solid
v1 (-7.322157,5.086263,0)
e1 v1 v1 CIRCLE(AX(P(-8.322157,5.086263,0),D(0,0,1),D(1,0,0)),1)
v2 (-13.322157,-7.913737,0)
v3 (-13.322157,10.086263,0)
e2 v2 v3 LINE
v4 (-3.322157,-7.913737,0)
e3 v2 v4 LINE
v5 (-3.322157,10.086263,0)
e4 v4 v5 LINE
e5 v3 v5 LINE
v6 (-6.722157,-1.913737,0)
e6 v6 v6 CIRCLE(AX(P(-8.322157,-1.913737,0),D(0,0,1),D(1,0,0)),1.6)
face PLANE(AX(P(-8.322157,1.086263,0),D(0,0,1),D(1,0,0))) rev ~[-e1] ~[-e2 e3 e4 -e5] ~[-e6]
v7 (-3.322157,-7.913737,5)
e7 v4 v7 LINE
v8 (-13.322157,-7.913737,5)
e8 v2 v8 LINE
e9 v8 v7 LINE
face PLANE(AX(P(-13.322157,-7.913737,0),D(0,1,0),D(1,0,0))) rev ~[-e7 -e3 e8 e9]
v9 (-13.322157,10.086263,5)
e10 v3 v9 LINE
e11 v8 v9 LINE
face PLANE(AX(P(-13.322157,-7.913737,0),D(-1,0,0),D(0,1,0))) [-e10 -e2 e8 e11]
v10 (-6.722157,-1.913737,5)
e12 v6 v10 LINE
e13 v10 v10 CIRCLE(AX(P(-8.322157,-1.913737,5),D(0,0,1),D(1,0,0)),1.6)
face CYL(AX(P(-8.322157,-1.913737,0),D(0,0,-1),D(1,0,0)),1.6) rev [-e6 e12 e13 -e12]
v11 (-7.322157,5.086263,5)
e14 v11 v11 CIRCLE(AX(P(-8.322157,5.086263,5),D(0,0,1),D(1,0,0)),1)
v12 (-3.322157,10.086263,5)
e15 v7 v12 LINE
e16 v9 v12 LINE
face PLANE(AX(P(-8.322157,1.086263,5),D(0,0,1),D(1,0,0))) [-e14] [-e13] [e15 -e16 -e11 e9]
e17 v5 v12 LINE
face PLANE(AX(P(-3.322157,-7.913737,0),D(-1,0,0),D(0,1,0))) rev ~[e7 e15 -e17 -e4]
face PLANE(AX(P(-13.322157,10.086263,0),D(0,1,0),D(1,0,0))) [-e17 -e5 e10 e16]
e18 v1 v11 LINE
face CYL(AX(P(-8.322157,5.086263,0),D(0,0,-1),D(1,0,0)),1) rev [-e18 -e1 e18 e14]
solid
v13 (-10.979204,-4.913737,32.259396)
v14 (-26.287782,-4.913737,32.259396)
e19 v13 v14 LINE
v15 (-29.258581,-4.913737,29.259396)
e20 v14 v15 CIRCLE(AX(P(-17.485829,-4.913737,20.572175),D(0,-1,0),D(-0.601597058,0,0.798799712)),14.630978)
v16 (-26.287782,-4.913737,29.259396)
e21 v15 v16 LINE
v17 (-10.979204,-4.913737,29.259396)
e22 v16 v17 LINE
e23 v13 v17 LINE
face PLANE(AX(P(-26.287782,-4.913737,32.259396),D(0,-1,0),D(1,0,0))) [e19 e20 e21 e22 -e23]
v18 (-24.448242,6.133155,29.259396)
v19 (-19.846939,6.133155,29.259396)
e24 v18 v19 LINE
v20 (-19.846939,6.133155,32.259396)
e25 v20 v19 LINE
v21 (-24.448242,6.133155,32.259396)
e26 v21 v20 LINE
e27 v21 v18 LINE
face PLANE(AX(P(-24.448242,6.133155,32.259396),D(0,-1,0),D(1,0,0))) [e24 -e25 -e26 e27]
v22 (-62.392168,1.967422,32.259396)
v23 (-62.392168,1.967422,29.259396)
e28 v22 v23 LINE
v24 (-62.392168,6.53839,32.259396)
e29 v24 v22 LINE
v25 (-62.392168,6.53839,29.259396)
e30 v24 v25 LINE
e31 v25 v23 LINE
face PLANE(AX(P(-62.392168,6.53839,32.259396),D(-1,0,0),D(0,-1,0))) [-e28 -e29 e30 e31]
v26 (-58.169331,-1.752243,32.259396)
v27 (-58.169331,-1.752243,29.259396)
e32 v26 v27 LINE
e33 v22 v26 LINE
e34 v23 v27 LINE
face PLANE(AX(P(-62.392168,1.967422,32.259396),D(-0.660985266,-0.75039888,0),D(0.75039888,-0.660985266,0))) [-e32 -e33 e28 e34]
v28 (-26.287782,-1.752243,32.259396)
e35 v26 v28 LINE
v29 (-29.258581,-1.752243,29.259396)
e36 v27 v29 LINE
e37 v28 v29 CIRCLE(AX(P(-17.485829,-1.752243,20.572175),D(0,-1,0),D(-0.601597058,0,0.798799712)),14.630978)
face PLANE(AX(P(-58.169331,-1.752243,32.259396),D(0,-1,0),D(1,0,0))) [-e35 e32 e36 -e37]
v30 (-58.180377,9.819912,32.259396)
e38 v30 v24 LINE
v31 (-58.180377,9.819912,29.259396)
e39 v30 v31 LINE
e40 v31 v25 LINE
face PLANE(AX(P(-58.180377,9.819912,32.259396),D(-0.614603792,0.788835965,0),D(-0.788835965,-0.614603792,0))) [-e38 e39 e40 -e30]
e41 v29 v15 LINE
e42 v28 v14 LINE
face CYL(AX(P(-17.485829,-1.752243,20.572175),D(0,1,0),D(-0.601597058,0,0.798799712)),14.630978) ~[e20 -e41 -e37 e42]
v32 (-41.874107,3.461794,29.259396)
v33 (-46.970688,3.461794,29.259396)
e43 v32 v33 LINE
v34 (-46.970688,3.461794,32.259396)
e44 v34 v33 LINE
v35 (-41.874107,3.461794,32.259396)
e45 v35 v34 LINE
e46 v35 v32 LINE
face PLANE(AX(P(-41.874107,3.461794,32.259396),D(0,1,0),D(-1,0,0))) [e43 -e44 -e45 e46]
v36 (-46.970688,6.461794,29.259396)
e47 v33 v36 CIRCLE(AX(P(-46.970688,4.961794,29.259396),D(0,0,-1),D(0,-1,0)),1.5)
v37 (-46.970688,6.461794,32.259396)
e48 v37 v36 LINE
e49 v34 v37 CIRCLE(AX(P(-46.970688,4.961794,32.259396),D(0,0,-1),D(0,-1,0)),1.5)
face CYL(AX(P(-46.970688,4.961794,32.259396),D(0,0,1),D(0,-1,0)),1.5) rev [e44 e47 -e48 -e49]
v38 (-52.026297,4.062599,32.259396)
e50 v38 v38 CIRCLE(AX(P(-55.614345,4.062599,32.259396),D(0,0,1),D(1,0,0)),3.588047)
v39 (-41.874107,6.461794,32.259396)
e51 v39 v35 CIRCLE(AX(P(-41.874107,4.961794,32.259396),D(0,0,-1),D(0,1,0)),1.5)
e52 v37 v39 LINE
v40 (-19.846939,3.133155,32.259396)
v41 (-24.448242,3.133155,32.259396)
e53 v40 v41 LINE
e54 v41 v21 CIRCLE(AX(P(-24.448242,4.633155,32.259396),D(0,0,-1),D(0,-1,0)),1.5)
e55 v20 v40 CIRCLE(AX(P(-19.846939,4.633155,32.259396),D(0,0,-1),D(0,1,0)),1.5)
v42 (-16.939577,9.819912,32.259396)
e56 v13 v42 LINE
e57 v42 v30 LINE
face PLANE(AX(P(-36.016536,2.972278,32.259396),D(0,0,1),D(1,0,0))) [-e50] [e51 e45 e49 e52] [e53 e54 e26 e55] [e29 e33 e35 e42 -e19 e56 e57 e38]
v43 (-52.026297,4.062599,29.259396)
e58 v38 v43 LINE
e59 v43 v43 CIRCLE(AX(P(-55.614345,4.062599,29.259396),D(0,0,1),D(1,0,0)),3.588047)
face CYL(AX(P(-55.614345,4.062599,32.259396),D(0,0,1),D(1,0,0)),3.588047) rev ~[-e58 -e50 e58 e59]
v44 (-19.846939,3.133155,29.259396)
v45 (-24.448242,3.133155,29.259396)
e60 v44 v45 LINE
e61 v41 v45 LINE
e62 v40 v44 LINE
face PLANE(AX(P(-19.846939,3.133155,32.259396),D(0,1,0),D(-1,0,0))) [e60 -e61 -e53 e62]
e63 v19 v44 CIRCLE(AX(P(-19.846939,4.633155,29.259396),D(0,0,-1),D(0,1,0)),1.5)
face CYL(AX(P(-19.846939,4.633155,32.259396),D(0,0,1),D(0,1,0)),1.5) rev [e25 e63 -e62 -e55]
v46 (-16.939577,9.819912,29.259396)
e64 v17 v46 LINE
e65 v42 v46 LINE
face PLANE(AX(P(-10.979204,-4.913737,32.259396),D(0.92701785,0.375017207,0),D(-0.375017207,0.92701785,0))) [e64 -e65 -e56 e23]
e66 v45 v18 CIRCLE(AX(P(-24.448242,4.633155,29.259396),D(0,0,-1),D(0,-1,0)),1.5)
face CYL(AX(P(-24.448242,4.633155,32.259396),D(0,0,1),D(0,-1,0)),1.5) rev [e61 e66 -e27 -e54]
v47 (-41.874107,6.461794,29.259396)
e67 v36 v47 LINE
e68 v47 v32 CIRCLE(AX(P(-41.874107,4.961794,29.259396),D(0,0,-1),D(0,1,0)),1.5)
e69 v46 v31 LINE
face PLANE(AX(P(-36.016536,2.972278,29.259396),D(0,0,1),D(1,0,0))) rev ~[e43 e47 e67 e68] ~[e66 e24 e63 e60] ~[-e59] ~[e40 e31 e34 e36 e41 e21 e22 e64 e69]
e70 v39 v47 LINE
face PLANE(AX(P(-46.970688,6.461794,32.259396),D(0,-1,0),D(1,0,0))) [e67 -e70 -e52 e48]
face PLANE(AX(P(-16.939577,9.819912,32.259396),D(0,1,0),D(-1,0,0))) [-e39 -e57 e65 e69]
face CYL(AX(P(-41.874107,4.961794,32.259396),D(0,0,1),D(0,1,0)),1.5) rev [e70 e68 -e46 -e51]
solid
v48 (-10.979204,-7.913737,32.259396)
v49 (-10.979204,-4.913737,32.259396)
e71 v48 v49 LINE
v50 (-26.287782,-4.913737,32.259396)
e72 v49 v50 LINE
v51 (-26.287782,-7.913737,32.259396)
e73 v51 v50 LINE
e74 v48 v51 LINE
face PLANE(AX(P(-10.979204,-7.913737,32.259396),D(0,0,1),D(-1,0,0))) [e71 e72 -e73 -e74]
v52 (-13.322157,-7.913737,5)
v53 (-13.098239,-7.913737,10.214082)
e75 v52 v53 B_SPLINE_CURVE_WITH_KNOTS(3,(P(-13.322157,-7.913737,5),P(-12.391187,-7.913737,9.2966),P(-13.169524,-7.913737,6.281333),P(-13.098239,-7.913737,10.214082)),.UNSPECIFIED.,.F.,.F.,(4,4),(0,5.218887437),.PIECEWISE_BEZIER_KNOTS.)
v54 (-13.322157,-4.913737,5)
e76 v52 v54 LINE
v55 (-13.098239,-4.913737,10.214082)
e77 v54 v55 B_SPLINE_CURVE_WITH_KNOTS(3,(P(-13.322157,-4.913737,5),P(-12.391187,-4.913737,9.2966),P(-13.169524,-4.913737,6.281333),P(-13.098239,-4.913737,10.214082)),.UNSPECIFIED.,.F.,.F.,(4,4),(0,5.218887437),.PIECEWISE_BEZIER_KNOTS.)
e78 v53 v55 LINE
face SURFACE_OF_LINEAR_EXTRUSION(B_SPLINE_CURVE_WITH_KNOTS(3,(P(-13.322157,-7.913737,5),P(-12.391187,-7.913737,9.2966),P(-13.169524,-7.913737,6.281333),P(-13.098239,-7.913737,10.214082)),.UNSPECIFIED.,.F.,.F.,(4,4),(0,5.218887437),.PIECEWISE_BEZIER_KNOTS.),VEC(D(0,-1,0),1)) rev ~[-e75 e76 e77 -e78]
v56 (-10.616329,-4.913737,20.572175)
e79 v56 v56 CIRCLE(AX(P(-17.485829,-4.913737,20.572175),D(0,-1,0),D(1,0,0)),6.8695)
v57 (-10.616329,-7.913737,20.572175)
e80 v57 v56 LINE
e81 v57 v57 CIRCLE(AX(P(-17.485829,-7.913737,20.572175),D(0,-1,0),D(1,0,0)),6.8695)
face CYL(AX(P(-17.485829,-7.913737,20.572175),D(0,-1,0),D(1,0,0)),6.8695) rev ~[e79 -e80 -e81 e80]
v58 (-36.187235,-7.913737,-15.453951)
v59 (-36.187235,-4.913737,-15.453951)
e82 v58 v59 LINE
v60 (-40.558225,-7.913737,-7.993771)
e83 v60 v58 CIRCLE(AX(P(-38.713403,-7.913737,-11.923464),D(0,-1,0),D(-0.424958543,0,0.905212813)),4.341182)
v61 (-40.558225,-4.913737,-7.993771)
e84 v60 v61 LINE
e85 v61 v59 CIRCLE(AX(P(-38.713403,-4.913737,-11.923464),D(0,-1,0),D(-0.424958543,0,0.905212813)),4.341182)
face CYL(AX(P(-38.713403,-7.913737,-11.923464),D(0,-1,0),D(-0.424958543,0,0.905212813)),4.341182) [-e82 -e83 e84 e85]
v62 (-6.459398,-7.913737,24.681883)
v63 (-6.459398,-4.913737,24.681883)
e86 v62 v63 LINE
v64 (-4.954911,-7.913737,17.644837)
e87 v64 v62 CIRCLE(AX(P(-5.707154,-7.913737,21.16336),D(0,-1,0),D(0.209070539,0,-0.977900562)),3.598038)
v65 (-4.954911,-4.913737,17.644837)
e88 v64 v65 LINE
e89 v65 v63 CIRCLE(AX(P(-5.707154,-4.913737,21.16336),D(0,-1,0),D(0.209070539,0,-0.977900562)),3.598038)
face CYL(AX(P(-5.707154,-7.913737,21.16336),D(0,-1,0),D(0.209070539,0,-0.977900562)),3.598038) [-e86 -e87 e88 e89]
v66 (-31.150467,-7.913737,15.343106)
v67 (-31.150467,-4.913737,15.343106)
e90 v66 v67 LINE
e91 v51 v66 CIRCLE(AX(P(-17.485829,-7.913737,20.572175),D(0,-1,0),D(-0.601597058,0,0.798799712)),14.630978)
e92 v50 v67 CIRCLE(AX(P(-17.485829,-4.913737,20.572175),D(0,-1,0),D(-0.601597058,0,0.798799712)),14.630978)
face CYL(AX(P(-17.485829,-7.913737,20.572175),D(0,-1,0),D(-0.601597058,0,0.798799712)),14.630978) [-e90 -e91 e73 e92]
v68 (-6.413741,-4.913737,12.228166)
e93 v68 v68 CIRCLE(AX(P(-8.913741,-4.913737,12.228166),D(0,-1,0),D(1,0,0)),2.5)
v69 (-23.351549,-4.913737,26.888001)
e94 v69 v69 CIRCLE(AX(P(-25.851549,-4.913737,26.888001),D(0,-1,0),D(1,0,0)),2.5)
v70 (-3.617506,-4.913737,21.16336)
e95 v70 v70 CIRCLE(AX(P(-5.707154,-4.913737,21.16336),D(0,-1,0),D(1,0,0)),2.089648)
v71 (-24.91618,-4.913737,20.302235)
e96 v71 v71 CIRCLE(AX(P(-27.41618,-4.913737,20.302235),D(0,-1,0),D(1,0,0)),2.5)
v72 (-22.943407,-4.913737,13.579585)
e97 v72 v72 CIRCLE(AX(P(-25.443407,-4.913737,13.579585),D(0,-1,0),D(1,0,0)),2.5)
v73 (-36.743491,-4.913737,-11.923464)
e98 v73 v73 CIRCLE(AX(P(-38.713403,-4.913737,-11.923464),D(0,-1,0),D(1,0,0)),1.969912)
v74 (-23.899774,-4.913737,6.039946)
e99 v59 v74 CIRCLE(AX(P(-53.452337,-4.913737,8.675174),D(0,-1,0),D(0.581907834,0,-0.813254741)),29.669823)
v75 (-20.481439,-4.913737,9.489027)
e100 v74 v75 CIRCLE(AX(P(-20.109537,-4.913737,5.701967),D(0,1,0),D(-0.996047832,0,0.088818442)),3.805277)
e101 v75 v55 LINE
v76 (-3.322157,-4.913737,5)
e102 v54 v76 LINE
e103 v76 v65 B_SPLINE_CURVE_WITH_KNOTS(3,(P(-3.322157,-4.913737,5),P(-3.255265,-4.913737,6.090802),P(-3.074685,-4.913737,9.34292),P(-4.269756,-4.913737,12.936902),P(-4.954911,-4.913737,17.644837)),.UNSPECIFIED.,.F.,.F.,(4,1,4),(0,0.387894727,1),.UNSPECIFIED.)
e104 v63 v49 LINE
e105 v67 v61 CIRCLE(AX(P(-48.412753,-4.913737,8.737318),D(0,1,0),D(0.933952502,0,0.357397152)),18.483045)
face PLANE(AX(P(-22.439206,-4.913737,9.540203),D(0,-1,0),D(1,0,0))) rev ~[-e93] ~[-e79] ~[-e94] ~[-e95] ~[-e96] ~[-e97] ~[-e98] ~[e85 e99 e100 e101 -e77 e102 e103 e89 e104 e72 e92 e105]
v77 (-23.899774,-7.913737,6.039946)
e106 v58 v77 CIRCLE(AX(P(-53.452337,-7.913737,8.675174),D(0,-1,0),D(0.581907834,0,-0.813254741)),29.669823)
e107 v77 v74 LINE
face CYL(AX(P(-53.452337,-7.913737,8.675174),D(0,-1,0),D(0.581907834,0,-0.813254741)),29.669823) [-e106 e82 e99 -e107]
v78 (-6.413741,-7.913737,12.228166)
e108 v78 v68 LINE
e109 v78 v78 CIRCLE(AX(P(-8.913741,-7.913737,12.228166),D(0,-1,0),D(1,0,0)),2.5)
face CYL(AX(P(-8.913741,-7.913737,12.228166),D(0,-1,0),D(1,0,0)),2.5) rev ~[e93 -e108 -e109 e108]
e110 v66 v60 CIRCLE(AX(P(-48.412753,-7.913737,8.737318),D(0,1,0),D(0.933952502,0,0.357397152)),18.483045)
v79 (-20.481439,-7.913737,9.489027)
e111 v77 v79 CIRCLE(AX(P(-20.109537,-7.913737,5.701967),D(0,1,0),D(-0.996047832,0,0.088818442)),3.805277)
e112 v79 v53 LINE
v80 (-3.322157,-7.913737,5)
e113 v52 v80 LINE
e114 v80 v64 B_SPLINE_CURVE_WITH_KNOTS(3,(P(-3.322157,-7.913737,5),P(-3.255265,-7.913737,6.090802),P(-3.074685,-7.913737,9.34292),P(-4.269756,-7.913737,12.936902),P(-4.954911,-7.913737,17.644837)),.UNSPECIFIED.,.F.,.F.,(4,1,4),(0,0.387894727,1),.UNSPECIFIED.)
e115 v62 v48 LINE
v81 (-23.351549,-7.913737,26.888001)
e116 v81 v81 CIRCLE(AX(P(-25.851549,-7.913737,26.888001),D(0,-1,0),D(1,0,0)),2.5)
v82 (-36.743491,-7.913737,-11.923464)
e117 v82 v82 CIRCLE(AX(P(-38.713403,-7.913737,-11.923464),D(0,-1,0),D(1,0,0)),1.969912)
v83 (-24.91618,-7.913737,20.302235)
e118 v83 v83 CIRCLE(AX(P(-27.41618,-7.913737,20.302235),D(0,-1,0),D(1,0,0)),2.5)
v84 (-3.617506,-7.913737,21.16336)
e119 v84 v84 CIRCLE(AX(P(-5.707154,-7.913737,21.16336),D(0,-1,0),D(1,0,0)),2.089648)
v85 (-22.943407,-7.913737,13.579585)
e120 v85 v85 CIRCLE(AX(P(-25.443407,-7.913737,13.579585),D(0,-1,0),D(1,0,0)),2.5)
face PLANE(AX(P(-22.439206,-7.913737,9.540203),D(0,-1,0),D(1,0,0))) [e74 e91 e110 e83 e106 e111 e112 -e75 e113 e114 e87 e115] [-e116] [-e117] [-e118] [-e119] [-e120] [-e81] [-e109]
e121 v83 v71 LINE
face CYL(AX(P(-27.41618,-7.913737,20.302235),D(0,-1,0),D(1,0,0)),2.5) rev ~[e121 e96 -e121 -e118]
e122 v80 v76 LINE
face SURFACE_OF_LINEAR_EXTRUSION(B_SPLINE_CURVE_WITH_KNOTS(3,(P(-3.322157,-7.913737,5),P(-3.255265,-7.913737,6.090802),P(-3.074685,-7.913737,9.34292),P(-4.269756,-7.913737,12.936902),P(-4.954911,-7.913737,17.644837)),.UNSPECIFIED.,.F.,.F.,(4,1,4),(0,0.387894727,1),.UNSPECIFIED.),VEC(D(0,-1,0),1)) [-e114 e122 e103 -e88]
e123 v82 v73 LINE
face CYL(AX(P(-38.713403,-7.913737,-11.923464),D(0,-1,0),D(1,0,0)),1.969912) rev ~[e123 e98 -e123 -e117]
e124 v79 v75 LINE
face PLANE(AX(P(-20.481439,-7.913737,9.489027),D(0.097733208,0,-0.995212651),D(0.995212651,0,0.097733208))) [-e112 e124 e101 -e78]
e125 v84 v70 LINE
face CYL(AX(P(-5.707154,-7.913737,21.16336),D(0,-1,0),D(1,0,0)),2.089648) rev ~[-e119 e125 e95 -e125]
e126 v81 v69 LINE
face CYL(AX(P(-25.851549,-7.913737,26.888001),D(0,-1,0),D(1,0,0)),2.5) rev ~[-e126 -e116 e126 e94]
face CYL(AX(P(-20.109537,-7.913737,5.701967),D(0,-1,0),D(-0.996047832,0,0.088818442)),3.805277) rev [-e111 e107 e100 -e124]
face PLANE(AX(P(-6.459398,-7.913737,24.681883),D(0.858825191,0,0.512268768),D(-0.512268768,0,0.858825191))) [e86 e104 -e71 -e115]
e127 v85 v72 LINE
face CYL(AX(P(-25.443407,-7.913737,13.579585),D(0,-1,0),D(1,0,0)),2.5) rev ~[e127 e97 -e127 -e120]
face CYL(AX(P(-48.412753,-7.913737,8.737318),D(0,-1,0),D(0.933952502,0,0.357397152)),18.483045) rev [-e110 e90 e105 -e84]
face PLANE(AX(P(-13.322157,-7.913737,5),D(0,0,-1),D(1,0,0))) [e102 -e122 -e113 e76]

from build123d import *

# Parameters (mm, degrees)
F0_W     = 10
F0_H     = 18
F0_R     = 1.6
F0_R_2   = 1
F1_DEPTH = 5
F2_R     = 1.9699121269
F2_R_2   = 2.5
F2_R_3   = 6.869499788
F2_R_4   = 2.0896484604
F3_DEPTH = 3
F4_R     = 3.5880472774
F5_DEPTH = 3
F7_DEPTH = 3.1614936367


with BuildPart() as f1:
    # F0 (on Top) → F1 (new body)
    with BuildSketch(Plane.XY):
        with Locations((-8.3221568636, 1.0862629861)):
            Rectangle(F0_W, F0_H)
        with Locations((-8.3221568636, -1.9137370139)):
            Circle(F0_R, mode=Mode.SUBTRACT)
        with Locations((-8.3221568636, 5.0862629861)):
            Circle(F0_R_2, mode=Mode.SUBTRACT)
    extrude(amount=F1_DEPTH)


with BuildPart() as f3:
    # F2 (on face) → F3 (new body)
    with BuildSketch(Plane.XZ.offset(7.9137370139)):
        with BuildLine():
            Line((-13.3221568636, 5), (-3.3221568636, 5))
            add(Edge.make_bspline(
                [(-3.3221568636, 5), (-3.2552653311, 6.0908019939), (-3.0746854072, 9.342919926), (-4.269755775, 12.9369020162), (-4.9549108371, 17.6448374987)],
                knots=[0, 0, 0, 0, 0.3878947266, 1, 1, 1, 1], degree=3))
            ThreePointArc((-4.9549108371, 17.6448374987), (-2.1886315475, 21.9156040845), (-6.4593981333, 24.6818833741))
            Line((-6.4593981333, 24.6818833741), (-10.9792040735, 32.2593962774))
            Line((-10.9792040735, 32.2593962774), (-26.2877818286, 32.2593962774))
            ThreePointArc((-26.2877818286, 32.2593962774), (-31.547377506, 24.6142485357), (-31.1504669753, 15.3431055256))
            ThreePointArc((-31.1504669753, 15.3431055256), (-31.2702316577, 1.826680677), (-40.5582249678, -7.9937706638))
            ThreePointArc((-40.5582249678, -7.9937706638), (-42.4590174037, -14.1180551679), (-36.1872349298, -15.4539508117))
            ThreePointArc((-36.1872349298, -15.4539508117), (-27.6944192034, -6.0499089443), (-23.8997744182, 6.0399460324))
            ThreePointArc((-23.8997744182, 6.0399460324), (-22.8122929978, 8.3806310483), (-20.4814388049, 9.4890266975))
            Line((-20.4814388049, 9.4890266975), (-13.098238966, 10.2140815927))
            add(Edge.make_bspline(
                [(-13.3221568636, 5), (-12.3911872602, 9.2965995769), (-13.1695237687, 6.2813326191), (-13.098238966, 10.2140815927)],
                knots=[0, 0, 0, 0, 5.2188874371, 5.2188874371, 5.2188874371, 5.2188874371], degree=3))
        make_face()
        with Locations((-38.7134026542, -11.9234640947)):
            Circle(F2_R, mode=Mode.SUBTRACT)
        with Locations((-25.4434074495, 13.5795854718)):
            Circle(F2_R_2, mode=Mode.SUBTRACT)
        with Locations((-27.4161801418, 20.3022349277)):
            Circle(F2_R_2, mode=Mode.SUBTRACT)
        with Locations((-25.8515487019, 26.8880009391)):
            Circle(F2_R_2, mode=Mode.SUBTRACT)
        with Locations((-8.913740901, 12.2281657972)):
            Circle(F2_R_2, mode=Mode.SUBTRACT)
        with Locations((-17.4858285757, 20.5721753575)):
            Circle(F2_R_3, mode=Mode.SUBTRACT)
        with Locations((-5.7071544852, 21.1633604364)):
            Circle(F2_R_4, mode=Mode.SUBTRACT)
    extrude(amount=-F3_DEPTH)


with BuildPart() as f5:
    # F4 (on face) → F5 (new body)
    with BuildSketch(Plane.XY.offset(32.2593962774)):
        Polygon((-26.2877818286, -4.9137370139), (-10.9792040735, -4.9137370139), (-16.9395767152, 9.8199117929), (-58.1803768873, 9.8199117929), (-62.392167747, 6.5383897163), (-62.392167747, 1.9674218294), (-58.1693314016, -1.7522433773), (-26.2043997645, -1.7522433773), align=None)
        with Locations((-55.6143447757, 4.0625985712)):
            Circle(F4_R, mode=Mode.SUBTRACT)
        with BuildLine():
            Line((-46.9706878066, 6.4617942423), (-41.8741069734, 6.4617942423))
            ThreePointArc((-41.8741069734, 6.4617942423), (-40.3741069734, 4.9617942423), (-41.8741069734, 3.4617942423))
            Line((-41.8741069734, 3.4617942423), (-46.9706878066, 3.4617942423))
            ThreePointArc((-46.9706878066, 3.4617942423), (-48.4706878066, 4.9617942423), (-46.9706878066, 6.4617942423))
        make_face(mode=Mode.SUBTRACT)
        with BuildLine():
            Line((-24.4482420385, 6.1331547201), (-19.8469385505, 6.1331547201))
            ThreePointArc((-19.8469385505, 6.1331547201), (-18.3469385505, 4.6331547201), (-19.8469385505, 3.1331547201))
            Line((-19.8469385505, 3.1331547201), (-24.4482420385, 3.1331547201))
            ThreePointArc((-24.4482420385, 3.1331547201), (-25.9482420385, 4.6331547201), (-24.4482420385, 6.1331547201))
        make_face(mode=Mode.SUBTRACT)
    extrude(amount=-F5_DEPTH)

    # F6 (on face) → F7 (join, through all)
    with BuildSketch(Plane.XZ.offset(1.7522433773)):
        with BuildLine():
            Line((-26.2043997645, 32.2593962774), (-26.2877818286, 32.2593962774))
            ThreePointArc((-26.2877818286, 32.2593962774), (-27.8819639855, 30.8671198662), (-29.2585812948, 29.2593962774))
            Line((-29.2585812948, 29.2593962774), (-26.2043997645, 29.2593962774))
            Line((-26.2043997645, 29.2593962774), (-26.2043997645, 32.2593962774))
        make_face()
    extrude(amount=F7_DEPTH)


solid = Compound([f1.part, f3.part, f5.part])
